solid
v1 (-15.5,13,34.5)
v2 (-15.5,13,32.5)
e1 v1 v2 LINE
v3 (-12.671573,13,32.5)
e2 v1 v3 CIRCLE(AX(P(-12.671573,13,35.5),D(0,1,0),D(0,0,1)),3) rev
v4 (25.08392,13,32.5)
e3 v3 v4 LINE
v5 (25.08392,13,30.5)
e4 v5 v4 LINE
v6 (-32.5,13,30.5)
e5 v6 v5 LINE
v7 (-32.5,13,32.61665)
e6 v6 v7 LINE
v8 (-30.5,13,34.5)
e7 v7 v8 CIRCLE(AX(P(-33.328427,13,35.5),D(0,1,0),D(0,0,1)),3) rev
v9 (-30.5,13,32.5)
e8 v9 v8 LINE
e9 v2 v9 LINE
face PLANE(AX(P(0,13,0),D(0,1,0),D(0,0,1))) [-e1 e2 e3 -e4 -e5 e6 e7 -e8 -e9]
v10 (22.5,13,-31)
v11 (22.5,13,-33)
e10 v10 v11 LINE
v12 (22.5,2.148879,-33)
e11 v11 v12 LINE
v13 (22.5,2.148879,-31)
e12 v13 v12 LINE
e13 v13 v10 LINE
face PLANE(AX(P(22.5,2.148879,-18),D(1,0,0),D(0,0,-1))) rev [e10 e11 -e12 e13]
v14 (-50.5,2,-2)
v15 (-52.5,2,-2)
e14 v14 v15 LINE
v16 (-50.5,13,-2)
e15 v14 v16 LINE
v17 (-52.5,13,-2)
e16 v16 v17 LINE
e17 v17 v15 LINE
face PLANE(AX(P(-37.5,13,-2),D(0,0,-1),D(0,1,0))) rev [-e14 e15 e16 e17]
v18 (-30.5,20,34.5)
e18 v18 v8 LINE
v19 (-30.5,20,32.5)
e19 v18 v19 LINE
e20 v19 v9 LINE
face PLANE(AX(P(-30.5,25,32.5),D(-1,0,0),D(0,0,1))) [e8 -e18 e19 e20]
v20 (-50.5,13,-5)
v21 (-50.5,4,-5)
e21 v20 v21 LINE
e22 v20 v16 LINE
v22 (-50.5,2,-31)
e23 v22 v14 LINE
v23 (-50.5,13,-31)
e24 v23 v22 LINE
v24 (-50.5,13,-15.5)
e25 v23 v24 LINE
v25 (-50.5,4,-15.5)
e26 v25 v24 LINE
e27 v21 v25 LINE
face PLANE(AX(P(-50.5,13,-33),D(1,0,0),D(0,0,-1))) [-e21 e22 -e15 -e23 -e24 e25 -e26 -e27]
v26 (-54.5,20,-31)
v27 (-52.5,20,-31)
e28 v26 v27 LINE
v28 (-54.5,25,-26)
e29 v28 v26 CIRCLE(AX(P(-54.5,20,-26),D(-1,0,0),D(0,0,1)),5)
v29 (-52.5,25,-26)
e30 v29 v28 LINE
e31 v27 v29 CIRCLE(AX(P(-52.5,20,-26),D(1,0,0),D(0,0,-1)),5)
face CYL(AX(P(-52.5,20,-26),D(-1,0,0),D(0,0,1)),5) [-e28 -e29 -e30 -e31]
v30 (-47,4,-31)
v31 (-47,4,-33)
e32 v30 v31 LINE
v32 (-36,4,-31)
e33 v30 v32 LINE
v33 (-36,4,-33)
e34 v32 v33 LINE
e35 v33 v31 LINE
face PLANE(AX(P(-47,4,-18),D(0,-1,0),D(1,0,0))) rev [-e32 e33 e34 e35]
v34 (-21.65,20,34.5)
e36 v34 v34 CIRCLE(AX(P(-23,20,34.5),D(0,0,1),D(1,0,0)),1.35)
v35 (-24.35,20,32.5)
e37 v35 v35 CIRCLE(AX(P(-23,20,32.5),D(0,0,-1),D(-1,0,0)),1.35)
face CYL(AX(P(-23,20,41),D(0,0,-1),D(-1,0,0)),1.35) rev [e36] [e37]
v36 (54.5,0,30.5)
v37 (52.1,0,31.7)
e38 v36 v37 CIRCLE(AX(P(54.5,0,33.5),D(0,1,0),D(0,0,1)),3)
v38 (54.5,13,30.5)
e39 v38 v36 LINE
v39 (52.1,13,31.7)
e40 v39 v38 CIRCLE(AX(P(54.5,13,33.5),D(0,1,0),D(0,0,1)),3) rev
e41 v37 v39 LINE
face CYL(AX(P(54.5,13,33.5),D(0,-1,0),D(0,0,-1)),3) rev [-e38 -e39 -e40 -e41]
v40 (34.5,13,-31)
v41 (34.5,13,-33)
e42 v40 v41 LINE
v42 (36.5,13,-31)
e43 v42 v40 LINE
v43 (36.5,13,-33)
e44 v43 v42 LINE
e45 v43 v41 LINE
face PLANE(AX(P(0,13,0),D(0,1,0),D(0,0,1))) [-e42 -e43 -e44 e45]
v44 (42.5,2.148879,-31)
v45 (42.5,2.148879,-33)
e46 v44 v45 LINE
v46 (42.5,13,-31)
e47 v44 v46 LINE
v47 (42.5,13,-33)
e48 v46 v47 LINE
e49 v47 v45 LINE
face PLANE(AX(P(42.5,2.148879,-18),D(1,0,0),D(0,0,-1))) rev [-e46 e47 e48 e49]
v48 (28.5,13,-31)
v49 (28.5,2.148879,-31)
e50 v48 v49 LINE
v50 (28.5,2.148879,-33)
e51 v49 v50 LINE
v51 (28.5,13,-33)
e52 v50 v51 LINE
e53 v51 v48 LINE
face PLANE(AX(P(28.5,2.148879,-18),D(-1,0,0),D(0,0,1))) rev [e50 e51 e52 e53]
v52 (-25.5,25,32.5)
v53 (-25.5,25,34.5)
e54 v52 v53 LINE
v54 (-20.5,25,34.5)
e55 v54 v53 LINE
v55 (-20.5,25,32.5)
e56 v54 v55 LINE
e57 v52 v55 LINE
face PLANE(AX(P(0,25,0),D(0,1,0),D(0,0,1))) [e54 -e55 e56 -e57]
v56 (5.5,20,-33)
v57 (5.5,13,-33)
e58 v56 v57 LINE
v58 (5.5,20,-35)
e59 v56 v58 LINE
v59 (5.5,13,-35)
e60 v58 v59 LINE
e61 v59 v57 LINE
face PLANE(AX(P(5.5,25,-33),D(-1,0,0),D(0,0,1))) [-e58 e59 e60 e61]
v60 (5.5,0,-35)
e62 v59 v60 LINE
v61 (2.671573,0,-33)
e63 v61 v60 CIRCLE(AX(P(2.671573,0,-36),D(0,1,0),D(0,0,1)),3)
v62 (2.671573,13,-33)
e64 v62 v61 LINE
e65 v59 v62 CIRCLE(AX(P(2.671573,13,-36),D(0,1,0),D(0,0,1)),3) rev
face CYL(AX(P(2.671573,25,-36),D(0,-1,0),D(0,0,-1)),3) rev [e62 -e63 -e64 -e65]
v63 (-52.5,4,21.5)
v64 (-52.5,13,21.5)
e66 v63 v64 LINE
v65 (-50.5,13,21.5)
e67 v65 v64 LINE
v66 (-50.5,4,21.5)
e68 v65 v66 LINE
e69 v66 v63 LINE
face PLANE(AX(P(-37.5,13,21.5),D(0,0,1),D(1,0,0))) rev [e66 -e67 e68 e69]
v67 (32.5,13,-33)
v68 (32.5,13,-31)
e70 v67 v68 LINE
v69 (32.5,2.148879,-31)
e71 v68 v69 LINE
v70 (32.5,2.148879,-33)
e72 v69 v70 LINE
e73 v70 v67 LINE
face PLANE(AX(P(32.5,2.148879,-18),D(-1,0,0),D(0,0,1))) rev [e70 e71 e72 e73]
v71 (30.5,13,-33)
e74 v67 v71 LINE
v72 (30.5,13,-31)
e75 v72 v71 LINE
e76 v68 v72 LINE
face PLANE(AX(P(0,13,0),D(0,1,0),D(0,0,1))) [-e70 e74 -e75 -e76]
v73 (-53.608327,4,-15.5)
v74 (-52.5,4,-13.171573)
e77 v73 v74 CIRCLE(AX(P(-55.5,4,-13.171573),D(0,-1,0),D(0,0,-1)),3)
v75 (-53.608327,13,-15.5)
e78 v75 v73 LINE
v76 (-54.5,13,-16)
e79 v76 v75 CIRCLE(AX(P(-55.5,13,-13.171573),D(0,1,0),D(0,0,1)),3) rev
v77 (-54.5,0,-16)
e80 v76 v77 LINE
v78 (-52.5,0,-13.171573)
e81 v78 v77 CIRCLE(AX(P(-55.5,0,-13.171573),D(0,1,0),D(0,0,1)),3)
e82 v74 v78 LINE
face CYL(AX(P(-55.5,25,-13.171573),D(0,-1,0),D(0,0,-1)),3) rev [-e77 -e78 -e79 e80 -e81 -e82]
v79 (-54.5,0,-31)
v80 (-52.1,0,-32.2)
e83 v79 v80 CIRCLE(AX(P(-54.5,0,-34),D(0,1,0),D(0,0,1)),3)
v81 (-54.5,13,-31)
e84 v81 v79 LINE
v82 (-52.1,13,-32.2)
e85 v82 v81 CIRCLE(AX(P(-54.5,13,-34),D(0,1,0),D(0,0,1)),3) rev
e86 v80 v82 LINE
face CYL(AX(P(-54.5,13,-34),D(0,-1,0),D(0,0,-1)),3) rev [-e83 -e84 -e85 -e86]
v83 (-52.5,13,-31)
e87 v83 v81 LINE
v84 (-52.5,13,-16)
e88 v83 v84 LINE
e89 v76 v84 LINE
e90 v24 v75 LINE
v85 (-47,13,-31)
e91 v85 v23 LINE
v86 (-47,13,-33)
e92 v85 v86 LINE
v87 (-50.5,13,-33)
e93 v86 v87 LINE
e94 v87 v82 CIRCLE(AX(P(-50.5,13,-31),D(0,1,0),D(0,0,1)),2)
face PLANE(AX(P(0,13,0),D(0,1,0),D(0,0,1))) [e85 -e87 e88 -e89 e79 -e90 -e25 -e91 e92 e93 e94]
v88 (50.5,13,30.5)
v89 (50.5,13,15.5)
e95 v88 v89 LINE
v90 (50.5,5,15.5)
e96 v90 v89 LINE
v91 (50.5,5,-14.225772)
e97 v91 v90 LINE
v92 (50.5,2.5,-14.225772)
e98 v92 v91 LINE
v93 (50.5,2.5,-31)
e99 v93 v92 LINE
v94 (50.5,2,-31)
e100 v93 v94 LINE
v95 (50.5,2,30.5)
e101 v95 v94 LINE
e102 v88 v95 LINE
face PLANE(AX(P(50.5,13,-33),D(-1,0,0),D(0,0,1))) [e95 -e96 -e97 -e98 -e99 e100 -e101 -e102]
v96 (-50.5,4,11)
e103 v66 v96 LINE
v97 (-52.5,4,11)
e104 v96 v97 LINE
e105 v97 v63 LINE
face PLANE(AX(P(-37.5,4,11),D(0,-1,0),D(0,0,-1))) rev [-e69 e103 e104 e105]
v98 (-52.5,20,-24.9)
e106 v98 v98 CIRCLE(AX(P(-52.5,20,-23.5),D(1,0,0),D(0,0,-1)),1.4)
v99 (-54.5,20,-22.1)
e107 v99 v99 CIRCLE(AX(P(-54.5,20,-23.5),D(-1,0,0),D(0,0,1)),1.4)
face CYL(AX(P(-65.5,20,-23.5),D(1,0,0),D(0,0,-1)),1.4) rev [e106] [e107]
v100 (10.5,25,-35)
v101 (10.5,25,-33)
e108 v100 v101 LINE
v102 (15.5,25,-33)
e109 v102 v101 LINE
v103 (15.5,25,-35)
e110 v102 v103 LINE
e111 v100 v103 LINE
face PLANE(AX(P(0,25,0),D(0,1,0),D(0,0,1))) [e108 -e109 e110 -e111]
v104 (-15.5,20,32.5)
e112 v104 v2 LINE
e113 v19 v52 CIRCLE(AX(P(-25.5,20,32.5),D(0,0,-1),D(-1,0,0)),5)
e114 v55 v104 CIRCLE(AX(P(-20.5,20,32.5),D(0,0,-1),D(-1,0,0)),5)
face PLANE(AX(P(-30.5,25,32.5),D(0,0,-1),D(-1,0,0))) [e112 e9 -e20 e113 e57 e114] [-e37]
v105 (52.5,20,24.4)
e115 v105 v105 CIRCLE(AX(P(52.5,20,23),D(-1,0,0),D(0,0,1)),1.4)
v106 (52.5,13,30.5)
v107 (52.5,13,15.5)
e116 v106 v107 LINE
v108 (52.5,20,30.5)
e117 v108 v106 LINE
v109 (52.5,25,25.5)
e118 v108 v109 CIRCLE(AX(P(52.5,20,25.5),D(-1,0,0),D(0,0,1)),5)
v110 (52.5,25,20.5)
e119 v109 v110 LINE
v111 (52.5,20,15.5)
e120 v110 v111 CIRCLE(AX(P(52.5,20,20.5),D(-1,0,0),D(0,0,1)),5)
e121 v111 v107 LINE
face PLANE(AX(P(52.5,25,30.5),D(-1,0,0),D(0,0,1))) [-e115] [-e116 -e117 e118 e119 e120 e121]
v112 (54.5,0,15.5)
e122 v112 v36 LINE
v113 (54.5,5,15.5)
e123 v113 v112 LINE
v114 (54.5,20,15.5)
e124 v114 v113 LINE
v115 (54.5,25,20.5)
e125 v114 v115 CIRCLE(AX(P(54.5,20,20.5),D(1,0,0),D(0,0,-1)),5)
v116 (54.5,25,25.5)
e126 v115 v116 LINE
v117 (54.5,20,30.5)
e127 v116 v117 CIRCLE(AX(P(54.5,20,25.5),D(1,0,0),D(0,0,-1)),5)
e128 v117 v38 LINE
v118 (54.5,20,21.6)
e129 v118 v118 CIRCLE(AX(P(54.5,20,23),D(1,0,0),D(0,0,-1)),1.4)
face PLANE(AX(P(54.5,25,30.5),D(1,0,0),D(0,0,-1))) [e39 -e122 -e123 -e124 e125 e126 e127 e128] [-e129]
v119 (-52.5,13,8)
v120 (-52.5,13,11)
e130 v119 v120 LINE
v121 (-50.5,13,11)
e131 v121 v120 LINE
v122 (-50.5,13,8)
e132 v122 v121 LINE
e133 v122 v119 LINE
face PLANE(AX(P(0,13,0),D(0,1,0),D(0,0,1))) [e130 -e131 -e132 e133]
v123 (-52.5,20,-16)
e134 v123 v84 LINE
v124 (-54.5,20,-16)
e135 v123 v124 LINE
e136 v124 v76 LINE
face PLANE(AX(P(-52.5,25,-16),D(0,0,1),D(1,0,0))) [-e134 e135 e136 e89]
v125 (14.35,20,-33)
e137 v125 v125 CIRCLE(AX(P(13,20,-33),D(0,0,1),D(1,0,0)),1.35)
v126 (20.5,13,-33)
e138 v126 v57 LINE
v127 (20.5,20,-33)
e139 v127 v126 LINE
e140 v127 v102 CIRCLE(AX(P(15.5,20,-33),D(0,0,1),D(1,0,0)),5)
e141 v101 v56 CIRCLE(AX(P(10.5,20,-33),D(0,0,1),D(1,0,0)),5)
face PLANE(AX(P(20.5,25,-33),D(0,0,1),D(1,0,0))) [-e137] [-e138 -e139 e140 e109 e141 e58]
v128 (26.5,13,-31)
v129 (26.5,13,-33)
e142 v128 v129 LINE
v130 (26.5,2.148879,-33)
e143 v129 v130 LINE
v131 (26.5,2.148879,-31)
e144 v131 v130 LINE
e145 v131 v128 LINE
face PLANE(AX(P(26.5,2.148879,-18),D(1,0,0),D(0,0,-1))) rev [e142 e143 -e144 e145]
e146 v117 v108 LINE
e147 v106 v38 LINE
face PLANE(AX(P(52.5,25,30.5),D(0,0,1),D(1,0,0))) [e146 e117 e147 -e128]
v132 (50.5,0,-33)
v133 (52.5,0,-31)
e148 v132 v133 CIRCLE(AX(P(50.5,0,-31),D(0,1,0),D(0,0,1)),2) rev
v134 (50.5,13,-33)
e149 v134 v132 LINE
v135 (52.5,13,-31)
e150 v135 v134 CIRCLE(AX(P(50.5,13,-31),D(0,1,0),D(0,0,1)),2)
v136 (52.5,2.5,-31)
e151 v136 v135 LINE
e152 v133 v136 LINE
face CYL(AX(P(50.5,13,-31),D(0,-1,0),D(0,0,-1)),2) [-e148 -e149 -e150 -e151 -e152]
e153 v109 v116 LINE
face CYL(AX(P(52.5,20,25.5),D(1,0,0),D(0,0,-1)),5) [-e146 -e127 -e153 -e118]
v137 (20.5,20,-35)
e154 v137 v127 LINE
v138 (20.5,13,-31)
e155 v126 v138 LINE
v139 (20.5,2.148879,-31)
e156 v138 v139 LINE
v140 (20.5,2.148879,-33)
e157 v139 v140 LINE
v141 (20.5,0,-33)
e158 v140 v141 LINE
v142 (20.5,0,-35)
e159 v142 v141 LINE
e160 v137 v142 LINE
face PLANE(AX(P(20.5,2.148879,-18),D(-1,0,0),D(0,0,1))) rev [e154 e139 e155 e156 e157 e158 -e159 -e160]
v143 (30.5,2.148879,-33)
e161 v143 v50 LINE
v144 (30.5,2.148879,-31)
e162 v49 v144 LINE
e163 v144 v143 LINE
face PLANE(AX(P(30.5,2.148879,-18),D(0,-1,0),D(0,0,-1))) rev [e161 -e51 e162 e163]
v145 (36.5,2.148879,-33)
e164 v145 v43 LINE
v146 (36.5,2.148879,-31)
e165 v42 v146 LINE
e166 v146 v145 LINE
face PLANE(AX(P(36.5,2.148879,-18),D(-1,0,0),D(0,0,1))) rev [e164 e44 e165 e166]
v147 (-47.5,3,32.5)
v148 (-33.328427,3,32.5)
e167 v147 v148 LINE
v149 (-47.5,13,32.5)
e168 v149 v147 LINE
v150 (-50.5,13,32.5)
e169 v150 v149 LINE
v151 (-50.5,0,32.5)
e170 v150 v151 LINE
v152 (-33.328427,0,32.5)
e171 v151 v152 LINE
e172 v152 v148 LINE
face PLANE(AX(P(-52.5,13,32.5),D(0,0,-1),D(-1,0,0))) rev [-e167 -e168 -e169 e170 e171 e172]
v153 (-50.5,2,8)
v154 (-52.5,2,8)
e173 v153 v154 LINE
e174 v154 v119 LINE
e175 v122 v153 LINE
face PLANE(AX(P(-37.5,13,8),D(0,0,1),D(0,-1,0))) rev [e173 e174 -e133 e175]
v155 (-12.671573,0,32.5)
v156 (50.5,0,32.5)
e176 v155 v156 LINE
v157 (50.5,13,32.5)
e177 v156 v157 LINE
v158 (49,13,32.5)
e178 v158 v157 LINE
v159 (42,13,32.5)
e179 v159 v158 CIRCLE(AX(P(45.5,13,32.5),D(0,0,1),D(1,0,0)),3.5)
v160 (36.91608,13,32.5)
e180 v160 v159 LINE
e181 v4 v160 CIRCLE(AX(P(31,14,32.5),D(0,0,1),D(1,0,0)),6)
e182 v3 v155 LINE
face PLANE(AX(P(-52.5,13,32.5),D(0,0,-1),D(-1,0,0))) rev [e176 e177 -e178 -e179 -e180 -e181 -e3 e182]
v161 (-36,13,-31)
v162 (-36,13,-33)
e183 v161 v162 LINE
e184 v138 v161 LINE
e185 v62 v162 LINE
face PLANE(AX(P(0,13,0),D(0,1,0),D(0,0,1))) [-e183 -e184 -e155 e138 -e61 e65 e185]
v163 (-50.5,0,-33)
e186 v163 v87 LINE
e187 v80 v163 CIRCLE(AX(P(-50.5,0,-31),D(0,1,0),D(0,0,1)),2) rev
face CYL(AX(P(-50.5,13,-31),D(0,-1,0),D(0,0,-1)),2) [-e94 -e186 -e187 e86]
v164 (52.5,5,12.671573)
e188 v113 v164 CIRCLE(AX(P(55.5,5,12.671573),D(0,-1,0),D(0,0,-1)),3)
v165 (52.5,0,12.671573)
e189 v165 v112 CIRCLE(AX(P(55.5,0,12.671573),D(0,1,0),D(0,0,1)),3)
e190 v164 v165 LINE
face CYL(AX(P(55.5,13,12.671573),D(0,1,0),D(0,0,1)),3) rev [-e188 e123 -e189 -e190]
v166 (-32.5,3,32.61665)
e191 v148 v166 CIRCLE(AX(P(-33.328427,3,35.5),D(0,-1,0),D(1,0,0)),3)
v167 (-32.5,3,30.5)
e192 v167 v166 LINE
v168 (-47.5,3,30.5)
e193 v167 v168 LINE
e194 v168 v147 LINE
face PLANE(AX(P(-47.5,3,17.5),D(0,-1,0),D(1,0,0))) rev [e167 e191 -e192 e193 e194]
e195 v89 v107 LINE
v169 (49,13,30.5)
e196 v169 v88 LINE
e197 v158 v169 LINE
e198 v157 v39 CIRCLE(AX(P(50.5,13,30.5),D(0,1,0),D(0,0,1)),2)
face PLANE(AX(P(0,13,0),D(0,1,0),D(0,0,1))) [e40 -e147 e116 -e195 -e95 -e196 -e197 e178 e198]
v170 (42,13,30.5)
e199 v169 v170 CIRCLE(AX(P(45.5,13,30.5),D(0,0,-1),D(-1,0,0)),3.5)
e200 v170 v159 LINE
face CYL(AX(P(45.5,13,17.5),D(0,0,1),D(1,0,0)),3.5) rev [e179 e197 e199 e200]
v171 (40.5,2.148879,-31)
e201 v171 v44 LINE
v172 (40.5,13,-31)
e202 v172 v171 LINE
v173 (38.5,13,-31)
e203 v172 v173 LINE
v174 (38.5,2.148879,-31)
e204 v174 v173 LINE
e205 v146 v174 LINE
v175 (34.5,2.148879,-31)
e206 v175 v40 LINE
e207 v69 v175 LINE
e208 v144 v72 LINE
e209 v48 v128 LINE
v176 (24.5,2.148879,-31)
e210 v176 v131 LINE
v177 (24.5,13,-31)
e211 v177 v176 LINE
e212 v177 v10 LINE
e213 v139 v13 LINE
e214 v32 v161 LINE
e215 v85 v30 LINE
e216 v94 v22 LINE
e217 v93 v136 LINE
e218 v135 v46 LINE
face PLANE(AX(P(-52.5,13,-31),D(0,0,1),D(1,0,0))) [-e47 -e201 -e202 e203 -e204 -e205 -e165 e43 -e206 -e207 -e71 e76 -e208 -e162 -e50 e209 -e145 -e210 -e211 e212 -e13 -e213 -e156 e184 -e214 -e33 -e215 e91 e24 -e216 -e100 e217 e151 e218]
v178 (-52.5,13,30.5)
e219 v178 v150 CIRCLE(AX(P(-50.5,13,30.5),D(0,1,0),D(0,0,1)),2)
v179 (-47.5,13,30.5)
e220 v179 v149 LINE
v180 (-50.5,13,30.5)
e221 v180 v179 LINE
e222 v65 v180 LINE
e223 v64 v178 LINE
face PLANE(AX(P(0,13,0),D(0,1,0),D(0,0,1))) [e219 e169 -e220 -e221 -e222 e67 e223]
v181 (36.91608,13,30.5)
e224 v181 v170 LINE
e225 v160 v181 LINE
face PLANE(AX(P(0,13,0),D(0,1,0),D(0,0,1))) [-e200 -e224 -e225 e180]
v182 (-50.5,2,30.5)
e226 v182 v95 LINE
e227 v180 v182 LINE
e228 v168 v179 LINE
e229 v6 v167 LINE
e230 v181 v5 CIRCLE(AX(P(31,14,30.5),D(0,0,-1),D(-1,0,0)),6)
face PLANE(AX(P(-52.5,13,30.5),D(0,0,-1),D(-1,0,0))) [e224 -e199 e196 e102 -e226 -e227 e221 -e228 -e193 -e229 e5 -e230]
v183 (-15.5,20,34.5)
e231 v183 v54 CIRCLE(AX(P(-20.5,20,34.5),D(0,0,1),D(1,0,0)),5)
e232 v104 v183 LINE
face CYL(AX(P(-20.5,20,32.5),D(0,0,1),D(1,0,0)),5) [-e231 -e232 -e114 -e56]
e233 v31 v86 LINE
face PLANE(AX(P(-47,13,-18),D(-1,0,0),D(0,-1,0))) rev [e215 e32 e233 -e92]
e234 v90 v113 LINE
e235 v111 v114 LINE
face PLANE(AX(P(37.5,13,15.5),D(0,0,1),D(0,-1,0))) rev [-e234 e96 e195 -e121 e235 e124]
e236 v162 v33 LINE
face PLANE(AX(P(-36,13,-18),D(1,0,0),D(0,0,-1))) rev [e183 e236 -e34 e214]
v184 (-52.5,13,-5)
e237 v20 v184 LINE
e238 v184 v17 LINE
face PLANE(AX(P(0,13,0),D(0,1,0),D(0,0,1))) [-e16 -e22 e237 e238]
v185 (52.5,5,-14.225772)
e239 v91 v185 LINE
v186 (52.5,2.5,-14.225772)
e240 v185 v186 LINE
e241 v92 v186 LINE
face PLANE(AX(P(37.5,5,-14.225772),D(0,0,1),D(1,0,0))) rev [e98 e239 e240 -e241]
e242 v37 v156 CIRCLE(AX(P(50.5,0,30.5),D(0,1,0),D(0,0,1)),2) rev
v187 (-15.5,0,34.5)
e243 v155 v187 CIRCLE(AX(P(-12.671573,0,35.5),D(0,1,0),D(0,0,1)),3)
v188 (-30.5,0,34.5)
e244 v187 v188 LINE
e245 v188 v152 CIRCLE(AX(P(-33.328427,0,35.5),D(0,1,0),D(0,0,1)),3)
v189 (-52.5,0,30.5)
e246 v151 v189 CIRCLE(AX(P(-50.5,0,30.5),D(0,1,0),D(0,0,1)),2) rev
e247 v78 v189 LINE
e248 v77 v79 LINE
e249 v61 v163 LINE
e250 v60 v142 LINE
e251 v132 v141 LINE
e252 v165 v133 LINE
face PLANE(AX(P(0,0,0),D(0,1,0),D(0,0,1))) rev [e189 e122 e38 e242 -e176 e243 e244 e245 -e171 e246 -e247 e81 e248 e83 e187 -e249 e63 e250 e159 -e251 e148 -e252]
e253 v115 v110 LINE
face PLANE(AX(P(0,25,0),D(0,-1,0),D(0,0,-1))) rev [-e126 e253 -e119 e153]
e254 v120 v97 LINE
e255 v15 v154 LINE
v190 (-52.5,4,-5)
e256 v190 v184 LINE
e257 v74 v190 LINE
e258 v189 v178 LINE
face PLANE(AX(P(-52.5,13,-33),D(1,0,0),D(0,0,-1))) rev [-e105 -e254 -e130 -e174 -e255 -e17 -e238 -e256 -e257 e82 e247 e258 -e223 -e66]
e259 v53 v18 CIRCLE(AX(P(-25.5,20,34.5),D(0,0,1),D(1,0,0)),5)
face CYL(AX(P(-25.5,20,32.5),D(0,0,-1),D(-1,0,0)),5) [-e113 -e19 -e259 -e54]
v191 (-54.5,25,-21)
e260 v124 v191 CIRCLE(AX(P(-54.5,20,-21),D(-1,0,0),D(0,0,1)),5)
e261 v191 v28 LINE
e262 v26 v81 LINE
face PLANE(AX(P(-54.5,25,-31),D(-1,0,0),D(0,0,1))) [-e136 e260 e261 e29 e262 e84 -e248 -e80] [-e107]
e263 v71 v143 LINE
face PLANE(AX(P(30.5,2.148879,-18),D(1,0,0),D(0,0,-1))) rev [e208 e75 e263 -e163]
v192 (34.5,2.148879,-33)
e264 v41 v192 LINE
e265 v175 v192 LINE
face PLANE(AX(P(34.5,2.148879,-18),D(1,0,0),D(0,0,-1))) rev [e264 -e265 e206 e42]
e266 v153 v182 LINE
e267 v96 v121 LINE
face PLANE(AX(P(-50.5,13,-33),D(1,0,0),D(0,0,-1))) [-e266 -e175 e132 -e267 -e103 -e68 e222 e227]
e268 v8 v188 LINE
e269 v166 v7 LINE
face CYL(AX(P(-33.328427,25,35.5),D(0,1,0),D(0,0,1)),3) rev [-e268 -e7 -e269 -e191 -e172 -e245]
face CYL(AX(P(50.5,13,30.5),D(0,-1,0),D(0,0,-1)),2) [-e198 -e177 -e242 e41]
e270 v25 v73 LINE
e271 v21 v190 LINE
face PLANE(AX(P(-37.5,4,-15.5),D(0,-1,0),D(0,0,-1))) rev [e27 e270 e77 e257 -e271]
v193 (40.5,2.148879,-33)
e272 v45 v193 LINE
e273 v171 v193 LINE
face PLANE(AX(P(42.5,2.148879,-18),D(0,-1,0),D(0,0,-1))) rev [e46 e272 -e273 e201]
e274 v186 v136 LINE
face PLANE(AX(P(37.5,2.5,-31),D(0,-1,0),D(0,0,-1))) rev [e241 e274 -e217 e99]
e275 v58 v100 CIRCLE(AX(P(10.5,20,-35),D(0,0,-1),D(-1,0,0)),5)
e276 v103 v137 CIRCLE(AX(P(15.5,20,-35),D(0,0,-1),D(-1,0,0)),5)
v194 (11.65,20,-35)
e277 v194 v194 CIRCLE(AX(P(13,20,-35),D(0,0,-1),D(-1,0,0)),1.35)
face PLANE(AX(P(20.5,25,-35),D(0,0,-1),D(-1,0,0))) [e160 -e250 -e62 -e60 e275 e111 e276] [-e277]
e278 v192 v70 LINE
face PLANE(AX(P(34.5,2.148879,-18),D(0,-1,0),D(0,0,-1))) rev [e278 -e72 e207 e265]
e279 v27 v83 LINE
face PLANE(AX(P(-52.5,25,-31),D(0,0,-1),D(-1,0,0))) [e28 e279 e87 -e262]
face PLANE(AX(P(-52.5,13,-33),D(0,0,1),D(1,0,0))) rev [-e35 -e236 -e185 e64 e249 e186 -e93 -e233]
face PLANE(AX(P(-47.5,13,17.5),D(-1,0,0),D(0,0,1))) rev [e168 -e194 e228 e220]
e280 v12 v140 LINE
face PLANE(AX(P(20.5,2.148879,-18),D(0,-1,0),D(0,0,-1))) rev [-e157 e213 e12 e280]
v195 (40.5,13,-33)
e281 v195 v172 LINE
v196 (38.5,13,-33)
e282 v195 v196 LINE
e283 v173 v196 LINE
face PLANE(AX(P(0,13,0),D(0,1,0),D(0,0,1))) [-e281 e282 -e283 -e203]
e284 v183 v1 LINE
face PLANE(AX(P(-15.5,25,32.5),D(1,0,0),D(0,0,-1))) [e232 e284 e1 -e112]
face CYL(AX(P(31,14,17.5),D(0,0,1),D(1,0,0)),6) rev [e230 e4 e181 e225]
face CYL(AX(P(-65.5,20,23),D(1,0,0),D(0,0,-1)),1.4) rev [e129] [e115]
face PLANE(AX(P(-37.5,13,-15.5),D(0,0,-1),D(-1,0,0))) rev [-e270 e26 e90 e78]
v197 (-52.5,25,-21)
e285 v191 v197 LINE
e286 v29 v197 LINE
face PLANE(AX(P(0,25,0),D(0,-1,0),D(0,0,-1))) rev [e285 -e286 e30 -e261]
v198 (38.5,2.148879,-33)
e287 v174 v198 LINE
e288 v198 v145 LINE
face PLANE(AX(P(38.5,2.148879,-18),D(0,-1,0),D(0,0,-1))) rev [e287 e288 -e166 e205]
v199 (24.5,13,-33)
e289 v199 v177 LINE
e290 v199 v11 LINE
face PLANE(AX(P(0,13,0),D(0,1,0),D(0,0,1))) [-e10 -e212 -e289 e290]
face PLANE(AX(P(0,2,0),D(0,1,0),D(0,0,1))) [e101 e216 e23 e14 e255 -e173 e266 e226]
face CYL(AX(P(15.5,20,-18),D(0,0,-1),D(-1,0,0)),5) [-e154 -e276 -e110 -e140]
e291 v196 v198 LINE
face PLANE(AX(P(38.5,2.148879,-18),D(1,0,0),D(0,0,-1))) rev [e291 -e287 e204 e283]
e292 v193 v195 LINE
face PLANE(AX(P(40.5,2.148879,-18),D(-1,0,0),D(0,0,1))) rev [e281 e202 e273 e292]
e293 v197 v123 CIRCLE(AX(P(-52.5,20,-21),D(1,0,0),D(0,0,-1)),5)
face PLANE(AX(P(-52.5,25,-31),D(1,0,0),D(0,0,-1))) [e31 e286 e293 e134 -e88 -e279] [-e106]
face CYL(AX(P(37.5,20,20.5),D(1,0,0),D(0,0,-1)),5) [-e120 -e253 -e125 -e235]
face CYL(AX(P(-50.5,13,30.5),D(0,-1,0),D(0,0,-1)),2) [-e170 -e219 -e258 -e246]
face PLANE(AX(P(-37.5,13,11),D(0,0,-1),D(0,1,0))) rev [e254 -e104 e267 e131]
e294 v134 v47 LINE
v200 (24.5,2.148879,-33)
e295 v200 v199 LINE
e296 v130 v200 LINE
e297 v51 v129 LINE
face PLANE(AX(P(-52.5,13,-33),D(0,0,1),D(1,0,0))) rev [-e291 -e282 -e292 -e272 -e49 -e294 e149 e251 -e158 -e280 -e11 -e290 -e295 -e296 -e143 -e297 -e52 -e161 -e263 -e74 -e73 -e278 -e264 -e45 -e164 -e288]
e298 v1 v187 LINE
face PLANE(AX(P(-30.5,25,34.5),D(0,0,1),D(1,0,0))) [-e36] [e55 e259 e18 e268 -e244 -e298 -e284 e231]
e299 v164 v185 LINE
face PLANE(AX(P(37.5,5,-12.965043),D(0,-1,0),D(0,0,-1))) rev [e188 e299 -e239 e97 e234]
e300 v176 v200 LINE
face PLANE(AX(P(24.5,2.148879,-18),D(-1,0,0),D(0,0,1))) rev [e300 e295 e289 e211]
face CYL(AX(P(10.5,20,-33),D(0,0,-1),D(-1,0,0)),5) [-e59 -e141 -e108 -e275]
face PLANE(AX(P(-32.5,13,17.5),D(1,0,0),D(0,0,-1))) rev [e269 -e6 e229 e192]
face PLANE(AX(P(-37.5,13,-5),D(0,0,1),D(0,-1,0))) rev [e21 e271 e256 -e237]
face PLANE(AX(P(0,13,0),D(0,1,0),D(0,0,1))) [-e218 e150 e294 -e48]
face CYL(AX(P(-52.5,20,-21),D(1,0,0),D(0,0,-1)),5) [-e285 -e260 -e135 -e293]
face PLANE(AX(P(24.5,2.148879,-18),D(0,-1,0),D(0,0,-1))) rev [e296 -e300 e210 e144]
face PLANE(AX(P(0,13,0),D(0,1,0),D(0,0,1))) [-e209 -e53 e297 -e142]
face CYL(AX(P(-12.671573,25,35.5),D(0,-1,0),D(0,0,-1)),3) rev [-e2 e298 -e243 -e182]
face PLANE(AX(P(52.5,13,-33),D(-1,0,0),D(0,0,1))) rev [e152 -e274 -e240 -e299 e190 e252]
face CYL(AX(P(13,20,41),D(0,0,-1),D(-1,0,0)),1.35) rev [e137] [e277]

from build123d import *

# Parameters (mm, degrees)
SKETCH_1_W          = 105
SKETCH_1_H          = 65.5
EXTRUDE_1_DEPTH     = 13
SHELL_1_T           = -2
SKETCH_2_R          = 3.5
SKETCH_2_R_2        = 6
SKETCH_2_W          = 15
SKETCH_2_H          = 10
CUT_EXTRUDE_1_DEPTH = 15
SKETCH_3_W          = 10.5
SKETCH_3_H          = 9
SKETCH_3_W_2        = 10
SKETCH_3_H_2        = 11
CUT_EXTRUDE_2_DEPTH = 15
CUT_EXTRUDE_3_DEPTH = 15
FILLET_1_R          = 2
SKETCH_5_W          = 2
SKETCH_5_H          = 17.199999525
CUT_EXTRUDE_4_DEPTH = 15
SKETCH_6_W          = 11
SKETCH_6_H          = 9
CUT_EXTRUDE_5_DEPTH = 15
SKETCH_10_W         = 2
SKETCH_10_H         = 15
SKETCH_10_W_2       = 15
SKETCH_10_H_2       = 2
EXTRUDE_2_DEPTH     = 25
FILLET_2_R          = 3
FILLET_3_R          = 5
SKETCH_11_R         = 1.4
CUT_EXTRUDE_6_DEPTH = 120
SKETCH_13_R         = 1.35
CUT_EXTRUDE_7_DEPTH = 76


with BuildPart() as part:
    # 草图1 → 凸台-拉伸1 (new body)
    with BuildSketch(Plane(origin=(0, 0, 0), x_dir=(1, 0, 0), z_dir=(0, 1, 0))):
        with Locations((0, 0.25)):
            Rectangle(SKETCH_1_W, SKETCH_1_H)
    extrude(amount=EXTRUDE_1_DEPTH)

    # 抽壳1
    shell_1_openings = [part.faces().sort_by_distance(p)[0] for p in [
        (0, 13, -0.25),
    ]]
    offset(amount=SHELL_1_T, openings=shell_1_openings, kind=Kind.INTERSECTION)

    # 草图2 → 切除-拉伸1 (cut)
    with BuildSketch(Plane.XY.offset(32.5)):
        with Locations((45.5, 13)):
            Circle(SKETCH_2_R)
        with Locations((31, 14)):
            Circle(SKETCH_2_R_2)
        with Locations((-40, 8)):
            Rectangle(SKETCH_2_W, SKETCH_2_H)
    extrude(amount=-CUT_EXTRUDE_1_DEPTH, mode=Mode.SUBTRACT)

    # 草图3 → 切除-拉伸2 (cut)
    with BuildSketch(Plane.ZY.offset(52.5)):
        with Locations((16.25, 8.5)):
            Rectangle(SKETCH_3_W, SKETCH_3_H)
        with Locations((-10.25, 8.5)):
            Rectangle(SKETCH_3_W, SKETCH_3_H)
        with Locations((3, 7.5)):
            Rectangle(SKETCH_3_W_2, SKETCH_3_H_2)
    extrude(amount=-CUT_EXTRUDE_2_DEPTH, mode=Mode.SUBTRACT)

    # 草图4 → 切除-拉伸3 (cut)
    with BuildSketch(Plane(origin=(52.5, 0, 0), x_dir=(0, 0, -1), z_dir=(1, 0, 0))):
        Polygon((31, 13), (14.225771641, 13), (12.965043457, 13), (-15.5, 13), (-15.5, 5), (12.965043457, 5), (14.225771641, 5), (14.225771641, 2.5), (31, 2.5), align=None)
    extrude(amount=-CUT_EXTRUDE_3_DEPTH, mode=Mode.SUBTRACT)

    # 圆角1
    fillet_1_edges = [part.edges().sort_by_distance(p)[0] for p in [
        (-52.5, 6.5, -33),
        (52.5, 6.5, -33),
        (52.5, 6.5, 32.5),
        (-52.5, 6.5, 32.5),
    ]]
    fillet(fillet_1_edges, radius=FILLET_1_R)

    # 草图5 → 切除-拉伸4 (cut)
    with BuildSketch(Plane(origin=(0, 0, -33), x_dir=(-1, 0, 0), z_dir=(0, 0, -1))):
        with Locations((-41.5, 10.748878275)):
            Rectangle(SKETCH_5_W, SKETCH_5_H)
        with Locations((-37.5, 10.748878275)):
            Rectangle(SKETCH_5_W, SKETCH_5_H)
        with Locations((-33.5, 10.748878275)):
            Rectangle(SKETCH_5_W, SKETCH_5_H)
        with Locations((-29.5, 10.748878275)):
            Rectangle(SKETCH_5_W, SKETCH_5_H)
        with Locations((-25.5, 10.748878275)):
            Rectangle(SKETCH_5_W, SKETCH_5_H)
        with Locations((-21.5, 10.748878275)):
            Rectangle(SKETCH_5_W, SKETCH_5_H)
    extrude(amount=-CUT_EXTRUDE_4_DEPTH, mode=Mode.SUBTRACT)

    # 草图6 → 切除-拉伸5 (cut)
    with BuildSketch(Plane(origin=(0, 0, -33), x_dir=(-1, 0, 0), z_dir=(0, 0, -1))):
        with Locations((41.5, 8.5)):
            Rectangle(SKETCH_6_W, SKETCH_6_H)
    extrude(amount=-CUT_EXTRUDE_5_DEPTH, mode=Mode.SUBTRACT)

    # 草图10 → 凸台-拉伸2 (add)
    with BuildSketch(Plane.XZ):
        with Locations((-53.5, -23.5)):
            Rectangle(SKETCH_10_W, SKETCH_10_H)
        with Locations((53.5, 23)):
            Rectangle(SKETCH_10_W, SKETCH_10_H)
        with Locations((13, -34)):
            Rectangle(SKETCH_10_W_2, SKETCH_10_H_2)
        with Locations((-23, 33.5)):
            Rectangle(SKETCH_10_W_2, SKETCH_10_H_2)
    extrude(amount=-EXTRUDE_2_DEPTH)

    # 圆角2
    # the kernel refuses this fillet: 3 mm, written as the material it adds along each edge
    with BuildSketch(Plane(origin=(52.5, 0, 30.5), x_dir=(-0.31622776601639135, 0, 0.9486832980506626), z_dir=(0, 1, 0)), Plane(origin=(-52.5, 0, -31), x_dir=(0.31622776601639135, 0, -0.9486832980506626), z_dir=(0, 1, 0))) as fillet_2_piece_1:
        with BuildLine():
            CenterArc((2.213594362, 2.846049894), FILLET_2_R, 198.434948823, 53.130102354)
            Line((-0.632455532, 1.897366596), (0, 0))
            ThreePointArc((0, 0), (0.632455532, 0.102633404), (1.264911064, 0))
        make_face()
    extrude(amount=13)
    with BuildSketch(Plane(origin=(-52.5, 0, -16), x_dir=(0, 0, 1), z_dir=(0, 1, 0))) as fillet_2_piece_2_section:
        with BuildLine():
            CenterArc((2.828427125, -3), FILLET_2_R, 90, 70.528779366)
            Line((0, -2), (0, 0))
            Line((0, 0), (2.828427125, 0))
        make_face()
    fillet_2_piece_2 = extrude(amount=20.071067812, mode=Mode.PRIVATE)
    fillet_2_piece_2 = split(fillet_2_piece_2, bisect_by=Plane(origin=(-52.5, 4, -16), z_dir=(0, -1, 0)), keep=Keep.TOP, mode=Mode.PRIVATE)
    add(fillet_2_piece_2)
    with BuildSketch(Plane(origin=(-52.5, -7.071067812, -16), x_dir=(0, 0, 1), z_dir=(0, 1, 0))) as fillet_2_piece_3_section:
        with BuildLine():
            CenterArc((2.828427125, -3), FILLET_2_R, 90, 70.528779366)
            Line((0, -2), (0, 0))
            Line((0, 0), (2.828427125, 0))
        make_face()
    fillet_2_piece_3 = extrude(amount=20.071067812, mode=Mode.PRIVATE)
    fillet_2_piece_3 = split(fillet_2_piece_3, bisect_by=Plane(origin=(-52.5, -7.071067812, -15.5), z_dir=(0, 0, -1)), keep=Keep.TOP, mode=Mode.PRIVATE)
    fillet_2_piece_3 = split(fillet_2_piece_3, bisect_by=Plane(origin=(-52.5, 4, -16), z_dir=(0, 1, 0)), keep=Keep.TOP, mode=Mode.PRIVATE)
    add(fillet_2_piece_3)
    with BuildSketch(Plane(origin=(52.5, 0, 15.5), x_dir=(0, 0, -1), z_dir=(0, 1, 0))) as fillet_2_piece_4:
        with BuildLine():
            CenterArc((2.828427125, -3), FILLET_2_R, 90, 70.528779366)
            Line((0, -2), (0, 0))
            Line((0, 0), (2.828427125, 0))
        make_face()
    extrude(amount=5)
    with BuildSketch(Plane(origin=(5.5, 0, -33), x_dir=(-1, 0, 0), z_dir=(0, 1, 0)), Plane(origin=(-15.5, 0, 32.5), x_dir=(1, 0, 0), z_dir=(0, 1, 0))) as fillet_2_piece_5:
        with BuildLine():
            CenterArc((2.828427125, -3), FILLET_2_R, 90, 70.528779366)
            Line((0, -2), (0, 0))
            Line((0, 0), (2.828427125, 0))
        make_face()
    extrude(amount=13)
    with BuildSketch(Plane(origin=(-30.5, 0, 32.5), x_dir=(-1, 0, 0), z_dir=(0, 1, 0))) as fillet_2_piece_6_section:
        with BuildLine():
            CenterArc((2.828427125, 3), FILLET_2_R, 199.471220634, 70.528779366)
            Line((0, 2), (0, 0))
            Line((0, 0), (2.828427125, 0))
        make_face()
    fillet_2_piece_6 = extrude(amount=20.071067812, mode=Mode.PRIVATE)
    fillet_2_piece_6 = split(fillet_2_piece_6, bisect_by=Plane(origin=(-30.5, 3, 32.5), z_dir=(0, -1, 0)), keep=Keep.TOP, mode=Mode.PRIVATE)
    add(fillet_2_piece_6)
    with BuildSketch(Plane(origin=(-30.5, -7.071067812, 32.5), x_dir=(-1, 0, 0), z_dir=(0, 1, 0))) as fillet_2_piece_7_section:
        with BuildLine():
            CenterArc((2.828427125, 3), FILLET_2_R, 199.471220634, 70.528779366)
            Line((0, 2), (0, 0))
            Line((0, 0), (2.828427125, 0))
        make_face()
    fillet_2_piece_7 = extrude(amount=20.071067812, mode=Mode.PRIVATE)
    fillet_2_piece_7 = split(fillet_2_piece_7, bisect_by=Plane(origin=(-30.5, 3, 32.5), z_dir=(0, 1, 0)), keep=Keep.TOP, mode=Mode.PRIVATE)
    fillet_2_piece_7 = split(fillet_2_piece_7, bisect_by=Plane(origin=(-32.5, -7.071067812, 32.5), z_dir=(1, 0, 0)), keep=Keep.TOP, mode=Mode.PRIVATE)
    add(fillet_2_piece_7)

    # 圆角3
    fillet_3_edges = [part.edges().sort_by_distance(p)[0] for p in [
        (-53.5, 25, -31),
        (-53.5, 25, -16),
        (53.5, 25, 30.5),
        (53.5, 25, 15.5),
        (20.5, 25, -34),
        (5.5, 25, -34),
        (-30.5, 25, 33.5),
        (-15.5, 25, 33.5),
    ]]
    fillet(fillet_3_edges, radius=FILLET_3_R)

    # 草图11 → 切除-拉伸6 (cut)
    with BuildSketch(Plane(origin=(54.5, 0, 0), x_dir=(0, 0, -1), z_dir=(1, 0, 0))):
        with Locations((-23, 20)):
            Circle(SKETCH_11_R)
        with Locations((23.5, 20)):
            Circle(SKETCH_11_R)
    extrude(amount=-CUT_EXTRUDE_6_DEPTH, mode=Mode.SUBTRACT)

    # 草图13 → 切除-拉伸7 (cut)
    with BuildSketch(Plane(origin=(0, 0, -35), x_dir=(-1, 0, 0), z_dir=(0, 0, -1))):
        with Locations((-13, 20)):
            Circle(SKETCH_13_R)
        with Locations((23, 20)):
            Circle(SKETCH_13_R)
    extrude(amount=-CUT_EXTRUDE_7_DEPTH, mode=Mode.SUBTRACT)


solid = part.part
